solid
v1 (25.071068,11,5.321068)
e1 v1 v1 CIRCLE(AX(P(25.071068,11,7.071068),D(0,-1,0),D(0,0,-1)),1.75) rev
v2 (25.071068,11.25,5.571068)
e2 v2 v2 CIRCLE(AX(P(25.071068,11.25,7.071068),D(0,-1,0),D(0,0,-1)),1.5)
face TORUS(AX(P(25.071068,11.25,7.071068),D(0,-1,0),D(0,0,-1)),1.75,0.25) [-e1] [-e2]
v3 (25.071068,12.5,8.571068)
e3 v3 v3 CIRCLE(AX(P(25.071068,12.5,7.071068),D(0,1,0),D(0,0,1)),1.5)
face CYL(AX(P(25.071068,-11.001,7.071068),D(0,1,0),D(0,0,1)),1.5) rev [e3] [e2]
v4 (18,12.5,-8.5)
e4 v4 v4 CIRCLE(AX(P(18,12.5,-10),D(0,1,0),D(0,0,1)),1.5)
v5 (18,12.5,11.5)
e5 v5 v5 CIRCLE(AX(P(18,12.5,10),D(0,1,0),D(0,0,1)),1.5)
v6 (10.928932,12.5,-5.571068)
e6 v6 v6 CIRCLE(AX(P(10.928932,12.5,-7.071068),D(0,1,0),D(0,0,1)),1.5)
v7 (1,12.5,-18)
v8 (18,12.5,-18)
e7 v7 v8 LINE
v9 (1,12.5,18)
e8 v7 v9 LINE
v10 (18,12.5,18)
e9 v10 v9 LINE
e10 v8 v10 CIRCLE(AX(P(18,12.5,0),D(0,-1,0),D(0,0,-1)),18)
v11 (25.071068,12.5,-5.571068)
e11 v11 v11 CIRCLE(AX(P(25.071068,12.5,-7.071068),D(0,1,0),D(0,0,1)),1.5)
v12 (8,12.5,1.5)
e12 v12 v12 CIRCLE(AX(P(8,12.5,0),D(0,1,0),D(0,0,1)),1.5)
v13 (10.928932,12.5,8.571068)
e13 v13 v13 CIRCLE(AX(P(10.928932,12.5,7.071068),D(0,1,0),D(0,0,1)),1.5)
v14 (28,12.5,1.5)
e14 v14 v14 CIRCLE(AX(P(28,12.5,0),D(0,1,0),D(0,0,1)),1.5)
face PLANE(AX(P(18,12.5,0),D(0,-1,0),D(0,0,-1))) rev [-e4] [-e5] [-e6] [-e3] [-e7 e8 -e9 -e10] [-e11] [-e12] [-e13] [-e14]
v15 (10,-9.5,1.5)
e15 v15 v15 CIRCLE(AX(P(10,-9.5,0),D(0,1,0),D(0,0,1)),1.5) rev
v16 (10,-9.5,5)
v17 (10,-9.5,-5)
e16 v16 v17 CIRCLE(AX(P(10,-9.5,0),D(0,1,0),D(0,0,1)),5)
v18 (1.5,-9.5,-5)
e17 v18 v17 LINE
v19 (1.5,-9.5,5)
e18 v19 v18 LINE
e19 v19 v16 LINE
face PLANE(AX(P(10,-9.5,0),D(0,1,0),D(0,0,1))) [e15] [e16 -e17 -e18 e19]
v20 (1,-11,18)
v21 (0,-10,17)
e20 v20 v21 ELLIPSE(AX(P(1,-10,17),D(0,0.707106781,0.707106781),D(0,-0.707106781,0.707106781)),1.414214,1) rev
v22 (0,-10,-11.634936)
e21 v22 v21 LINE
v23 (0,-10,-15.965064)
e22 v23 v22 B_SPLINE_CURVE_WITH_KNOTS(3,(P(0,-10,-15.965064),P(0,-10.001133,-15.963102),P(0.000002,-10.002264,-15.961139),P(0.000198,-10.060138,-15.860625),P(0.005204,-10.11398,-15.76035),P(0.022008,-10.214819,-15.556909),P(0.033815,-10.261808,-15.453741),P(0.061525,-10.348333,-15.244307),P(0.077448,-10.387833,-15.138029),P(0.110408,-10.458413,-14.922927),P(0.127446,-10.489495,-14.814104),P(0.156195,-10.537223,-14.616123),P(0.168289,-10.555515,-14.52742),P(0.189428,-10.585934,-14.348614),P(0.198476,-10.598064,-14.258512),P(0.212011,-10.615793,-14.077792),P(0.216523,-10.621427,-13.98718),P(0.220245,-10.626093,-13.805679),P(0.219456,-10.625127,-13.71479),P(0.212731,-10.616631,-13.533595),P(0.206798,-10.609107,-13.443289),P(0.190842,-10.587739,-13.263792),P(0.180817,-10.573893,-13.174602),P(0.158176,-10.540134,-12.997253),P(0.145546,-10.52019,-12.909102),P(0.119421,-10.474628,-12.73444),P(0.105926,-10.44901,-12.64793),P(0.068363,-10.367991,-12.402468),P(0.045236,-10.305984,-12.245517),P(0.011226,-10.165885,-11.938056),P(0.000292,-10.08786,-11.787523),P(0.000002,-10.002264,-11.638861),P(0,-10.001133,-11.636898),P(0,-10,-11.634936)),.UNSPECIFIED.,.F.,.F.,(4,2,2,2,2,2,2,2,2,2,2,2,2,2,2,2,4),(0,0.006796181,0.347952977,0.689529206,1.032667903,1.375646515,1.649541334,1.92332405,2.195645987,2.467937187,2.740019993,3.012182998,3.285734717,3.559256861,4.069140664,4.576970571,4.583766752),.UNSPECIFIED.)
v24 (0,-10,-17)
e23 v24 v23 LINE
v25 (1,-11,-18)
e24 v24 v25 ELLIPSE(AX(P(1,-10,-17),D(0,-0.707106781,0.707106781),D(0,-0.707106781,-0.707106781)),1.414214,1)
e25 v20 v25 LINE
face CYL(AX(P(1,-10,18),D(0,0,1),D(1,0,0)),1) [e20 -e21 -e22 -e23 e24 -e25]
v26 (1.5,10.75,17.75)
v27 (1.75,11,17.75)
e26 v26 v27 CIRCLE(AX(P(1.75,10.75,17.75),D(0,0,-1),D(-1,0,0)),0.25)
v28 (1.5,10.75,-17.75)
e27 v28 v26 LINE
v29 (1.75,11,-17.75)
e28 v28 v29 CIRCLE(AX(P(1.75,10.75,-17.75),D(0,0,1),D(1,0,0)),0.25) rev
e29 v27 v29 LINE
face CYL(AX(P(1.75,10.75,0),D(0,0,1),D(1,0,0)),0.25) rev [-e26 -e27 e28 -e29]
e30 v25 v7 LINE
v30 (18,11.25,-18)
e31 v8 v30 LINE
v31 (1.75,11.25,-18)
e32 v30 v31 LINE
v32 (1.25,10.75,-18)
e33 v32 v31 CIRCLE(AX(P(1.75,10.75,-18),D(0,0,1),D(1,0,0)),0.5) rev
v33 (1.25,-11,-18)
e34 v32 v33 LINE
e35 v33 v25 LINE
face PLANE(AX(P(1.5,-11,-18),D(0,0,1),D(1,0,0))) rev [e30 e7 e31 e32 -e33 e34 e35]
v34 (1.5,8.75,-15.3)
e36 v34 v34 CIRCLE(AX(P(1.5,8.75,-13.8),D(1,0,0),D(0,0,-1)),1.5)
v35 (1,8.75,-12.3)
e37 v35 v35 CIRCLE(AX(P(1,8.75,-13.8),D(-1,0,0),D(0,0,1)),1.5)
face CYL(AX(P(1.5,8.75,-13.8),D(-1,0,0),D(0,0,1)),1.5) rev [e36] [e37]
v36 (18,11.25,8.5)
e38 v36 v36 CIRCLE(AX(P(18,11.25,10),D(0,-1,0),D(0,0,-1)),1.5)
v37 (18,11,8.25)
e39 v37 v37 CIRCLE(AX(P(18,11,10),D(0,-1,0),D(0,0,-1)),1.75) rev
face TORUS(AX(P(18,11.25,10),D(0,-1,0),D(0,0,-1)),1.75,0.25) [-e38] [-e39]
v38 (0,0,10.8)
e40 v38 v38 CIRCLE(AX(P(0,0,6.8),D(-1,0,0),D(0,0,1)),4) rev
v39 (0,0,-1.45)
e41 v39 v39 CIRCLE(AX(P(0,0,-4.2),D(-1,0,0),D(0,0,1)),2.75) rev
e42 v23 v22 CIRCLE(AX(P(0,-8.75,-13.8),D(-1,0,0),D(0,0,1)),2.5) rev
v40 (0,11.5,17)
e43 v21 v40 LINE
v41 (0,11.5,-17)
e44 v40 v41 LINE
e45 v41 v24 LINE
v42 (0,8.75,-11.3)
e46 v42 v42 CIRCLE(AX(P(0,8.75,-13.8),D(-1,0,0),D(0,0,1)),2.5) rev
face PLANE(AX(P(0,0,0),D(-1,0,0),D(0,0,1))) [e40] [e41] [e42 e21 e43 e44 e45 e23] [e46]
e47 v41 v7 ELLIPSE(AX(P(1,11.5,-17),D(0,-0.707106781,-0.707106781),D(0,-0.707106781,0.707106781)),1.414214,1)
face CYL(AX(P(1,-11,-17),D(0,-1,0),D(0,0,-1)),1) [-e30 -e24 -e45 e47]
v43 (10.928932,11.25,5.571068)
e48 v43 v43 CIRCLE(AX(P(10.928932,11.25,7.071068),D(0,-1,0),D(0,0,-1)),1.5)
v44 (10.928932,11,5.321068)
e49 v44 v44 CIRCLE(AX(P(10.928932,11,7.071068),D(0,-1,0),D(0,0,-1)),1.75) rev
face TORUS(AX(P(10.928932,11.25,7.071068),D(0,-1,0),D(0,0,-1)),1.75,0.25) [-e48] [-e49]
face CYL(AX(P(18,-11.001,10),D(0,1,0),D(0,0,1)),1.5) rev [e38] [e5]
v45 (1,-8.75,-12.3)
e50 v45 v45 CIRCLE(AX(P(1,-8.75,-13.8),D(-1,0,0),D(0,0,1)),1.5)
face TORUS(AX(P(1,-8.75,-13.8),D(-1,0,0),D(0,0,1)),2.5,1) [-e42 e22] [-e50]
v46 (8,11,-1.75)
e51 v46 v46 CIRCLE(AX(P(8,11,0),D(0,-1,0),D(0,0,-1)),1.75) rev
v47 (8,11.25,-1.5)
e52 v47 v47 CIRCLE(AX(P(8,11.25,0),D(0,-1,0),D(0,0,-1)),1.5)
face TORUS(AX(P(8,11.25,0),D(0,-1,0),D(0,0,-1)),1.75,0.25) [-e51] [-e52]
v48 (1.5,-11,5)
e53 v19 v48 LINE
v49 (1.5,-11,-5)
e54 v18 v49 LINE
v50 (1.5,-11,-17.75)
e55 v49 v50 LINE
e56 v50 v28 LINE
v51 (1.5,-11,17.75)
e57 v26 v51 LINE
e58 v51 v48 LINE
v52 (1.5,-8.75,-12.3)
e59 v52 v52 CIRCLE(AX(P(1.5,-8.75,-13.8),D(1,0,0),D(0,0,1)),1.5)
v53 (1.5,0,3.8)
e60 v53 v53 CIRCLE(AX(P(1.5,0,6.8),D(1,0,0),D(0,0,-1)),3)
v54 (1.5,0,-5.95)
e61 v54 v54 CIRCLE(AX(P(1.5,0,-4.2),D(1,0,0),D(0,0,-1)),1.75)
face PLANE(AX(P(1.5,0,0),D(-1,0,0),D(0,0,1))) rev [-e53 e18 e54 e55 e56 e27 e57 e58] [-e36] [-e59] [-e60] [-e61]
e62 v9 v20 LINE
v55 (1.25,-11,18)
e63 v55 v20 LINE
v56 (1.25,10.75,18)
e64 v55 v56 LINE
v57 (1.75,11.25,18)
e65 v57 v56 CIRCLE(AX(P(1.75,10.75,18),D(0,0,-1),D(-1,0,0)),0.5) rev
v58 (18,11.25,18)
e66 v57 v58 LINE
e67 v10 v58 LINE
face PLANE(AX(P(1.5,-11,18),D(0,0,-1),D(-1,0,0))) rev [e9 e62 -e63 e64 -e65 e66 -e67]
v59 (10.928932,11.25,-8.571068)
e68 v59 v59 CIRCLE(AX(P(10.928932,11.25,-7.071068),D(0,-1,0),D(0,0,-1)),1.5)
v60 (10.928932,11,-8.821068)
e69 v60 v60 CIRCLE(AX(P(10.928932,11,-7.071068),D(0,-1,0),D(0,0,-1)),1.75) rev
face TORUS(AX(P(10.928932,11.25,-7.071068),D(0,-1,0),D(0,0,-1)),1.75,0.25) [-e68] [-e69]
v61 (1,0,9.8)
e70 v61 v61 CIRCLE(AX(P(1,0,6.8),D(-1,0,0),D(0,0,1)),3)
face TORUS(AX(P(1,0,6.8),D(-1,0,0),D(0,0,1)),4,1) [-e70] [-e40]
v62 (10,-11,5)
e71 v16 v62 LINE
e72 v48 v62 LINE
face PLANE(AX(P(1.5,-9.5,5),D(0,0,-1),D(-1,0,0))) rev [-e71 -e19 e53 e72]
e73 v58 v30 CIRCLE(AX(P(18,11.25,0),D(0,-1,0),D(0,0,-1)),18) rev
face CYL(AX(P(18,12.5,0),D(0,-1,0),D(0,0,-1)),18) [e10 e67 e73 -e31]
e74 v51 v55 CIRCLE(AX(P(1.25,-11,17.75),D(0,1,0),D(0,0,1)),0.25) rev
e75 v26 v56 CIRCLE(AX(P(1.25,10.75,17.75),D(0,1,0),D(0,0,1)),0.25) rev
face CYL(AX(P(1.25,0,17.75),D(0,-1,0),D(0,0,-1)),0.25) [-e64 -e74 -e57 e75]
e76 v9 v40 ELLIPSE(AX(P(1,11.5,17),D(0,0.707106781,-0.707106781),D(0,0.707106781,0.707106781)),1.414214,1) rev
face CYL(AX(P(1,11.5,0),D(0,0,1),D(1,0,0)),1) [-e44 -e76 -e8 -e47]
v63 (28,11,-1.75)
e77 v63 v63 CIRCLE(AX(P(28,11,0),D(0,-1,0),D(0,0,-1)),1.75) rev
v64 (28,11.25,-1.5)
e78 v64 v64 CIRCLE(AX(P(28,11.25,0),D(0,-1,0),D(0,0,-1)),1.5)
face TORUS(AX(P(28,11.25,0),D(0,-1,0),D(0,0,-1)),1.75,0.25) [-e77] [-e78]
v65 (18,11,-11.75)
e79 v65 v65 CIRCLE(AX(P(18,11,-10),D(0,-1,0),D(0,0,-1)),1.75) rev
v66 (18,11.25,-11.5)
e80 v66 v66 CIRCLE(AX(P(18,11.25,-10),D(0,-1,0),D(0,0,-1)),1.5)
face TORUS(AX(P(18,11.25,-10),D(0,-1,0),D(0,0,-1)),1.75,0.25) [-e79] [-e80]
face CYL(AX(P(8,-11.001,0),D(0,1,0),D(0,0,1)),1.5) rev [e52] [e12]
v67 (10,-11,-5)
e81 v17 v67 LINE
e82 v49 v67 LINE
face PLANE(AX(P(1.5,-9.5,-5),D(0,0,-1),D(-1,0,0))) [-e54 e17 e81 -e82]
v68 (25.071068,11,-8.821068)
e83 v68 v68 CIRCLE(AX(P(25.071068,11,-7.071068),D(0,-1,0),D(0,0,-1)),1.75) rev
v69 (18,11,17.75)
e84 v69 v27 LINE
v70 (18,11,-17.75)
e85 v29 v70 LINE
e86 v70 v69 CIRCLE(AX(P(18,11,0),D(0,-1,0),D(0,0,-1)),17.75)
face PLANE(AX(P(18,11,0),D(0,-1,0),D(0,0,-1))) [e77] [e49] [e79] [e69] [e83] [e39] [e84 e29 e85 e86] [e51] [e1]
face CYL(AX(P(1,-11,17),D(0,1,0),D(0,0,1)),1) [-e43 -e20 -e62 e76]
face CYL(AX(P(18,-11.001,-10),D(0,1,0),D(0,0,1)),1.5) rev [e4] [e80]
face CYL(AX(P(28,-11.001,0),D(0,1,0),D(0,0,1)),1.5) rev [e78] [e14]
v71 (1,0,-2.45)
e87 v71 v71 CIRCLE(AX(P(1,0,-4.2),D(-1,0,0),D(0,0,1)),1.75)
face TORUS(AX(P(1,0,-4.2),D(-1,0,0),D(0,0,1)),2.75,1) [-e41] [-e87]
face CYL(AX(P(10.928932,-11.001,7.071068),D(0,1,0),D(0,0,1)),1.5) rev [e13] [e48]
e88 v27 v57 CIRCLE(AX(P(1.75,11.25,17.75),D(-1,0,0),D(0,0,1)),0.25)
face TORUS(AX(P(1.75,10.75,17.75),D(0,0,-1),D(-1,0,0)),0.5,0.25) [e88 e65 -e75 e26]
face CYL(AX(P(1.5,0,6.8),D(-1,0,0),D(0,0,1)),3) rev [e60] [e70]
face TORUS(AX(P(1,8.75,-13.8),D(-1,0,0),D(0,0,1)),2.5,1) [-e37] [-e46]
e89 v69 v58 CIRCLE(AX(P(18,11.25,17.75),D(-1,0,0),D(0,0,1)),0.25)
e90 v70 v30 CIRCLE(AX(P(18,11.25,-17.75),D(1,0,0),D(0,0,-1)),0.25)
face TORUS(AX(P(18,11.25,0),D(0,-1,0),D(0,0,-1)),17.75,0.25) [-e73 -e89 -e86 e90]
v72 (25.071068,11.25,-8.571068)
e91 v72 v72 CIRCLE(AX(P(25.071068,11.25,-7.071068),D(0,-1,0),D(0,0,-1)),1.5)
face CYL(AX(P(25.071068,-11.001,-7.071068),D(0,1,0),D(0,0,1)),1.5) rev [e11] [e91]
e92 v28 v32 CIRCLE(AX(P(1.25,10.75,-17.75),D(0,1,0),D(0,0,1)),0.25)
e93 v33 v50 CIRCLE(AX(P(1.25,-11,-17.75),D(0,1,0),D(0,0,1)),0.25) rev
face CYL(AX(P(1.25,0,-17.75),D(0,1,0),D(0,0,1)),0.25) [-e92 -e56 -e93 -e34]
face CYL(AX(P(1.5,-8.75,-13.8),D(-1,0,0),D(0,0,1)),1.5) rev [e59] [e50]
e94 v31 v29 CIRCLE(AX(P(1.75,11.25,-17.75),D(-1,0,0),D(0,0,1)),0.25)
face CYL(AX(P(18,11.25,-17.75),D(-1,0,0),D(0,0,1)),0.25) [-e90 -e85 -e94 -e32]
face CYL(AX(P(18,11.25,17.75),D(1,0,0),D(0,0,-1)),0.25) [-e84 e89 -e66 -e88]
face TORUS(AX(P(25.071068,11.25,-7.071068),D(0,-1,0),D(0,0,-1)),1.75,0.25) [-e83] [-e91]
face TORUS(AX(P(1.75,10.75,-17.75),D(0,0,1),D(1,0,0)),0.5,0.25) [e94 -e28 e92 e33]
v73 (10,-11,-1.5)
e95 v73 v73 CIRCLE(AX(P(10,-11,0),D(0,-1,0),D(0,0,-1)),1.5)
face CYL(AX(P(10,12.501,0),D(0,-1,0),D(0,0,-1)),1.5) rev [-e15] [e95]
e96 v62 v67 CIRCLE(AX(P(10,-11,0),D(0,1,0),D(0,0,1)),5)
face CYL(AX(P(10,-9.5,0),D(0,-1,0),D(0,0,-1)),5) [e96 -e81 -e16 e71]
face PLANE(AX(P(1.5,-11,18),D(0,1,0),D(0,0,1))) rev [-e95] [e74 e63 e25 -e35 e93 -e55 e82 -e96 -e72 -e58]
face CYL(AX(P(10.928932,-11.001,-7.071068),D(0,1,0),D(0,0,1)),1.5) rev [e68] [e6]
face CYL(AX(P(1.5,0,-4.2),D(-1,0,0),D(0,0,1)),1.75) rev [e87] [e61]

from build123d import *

# Parameters (mm, degrees)
CROQUIS1_W              = 36
CROQUIS1_H              = 22
CROQUIS1_R              = 1.5
CROQUIS1_R_2            = 3
CROQUIS1_R_3            = 1.75
SALIENTE_EXTRUIR1_DEPTH = 1.5
SALIENTE_EXTRUIR3_START = -22
SALIENTE_EXTRUIR3_DEPTH = 1.5
SALIENTE_EXTRUIR4_START = 22
CROQUIS4_W              = 1.5
CROQUIS4_H              = 10
SALIENTE_EXTRUIR4_DEPTH = 1.5
CORTAR_EXTRUIR1_REACH   = 48.607
CROQUIS5_R              = 1.5
CORTAR_EXTRUIR2_REACH   = 48.607
CROQUIS7_R              = 1.5
REDONDEO2_R             = 1
REDONDEO3_R             = 0.25


with BuildPart() as part:
    # Croquis1 → Saliente-Extruir1 (new body)
    with BuildSketch(Plane(origin=(0, 0, 0), x_dir=(0, 0, -1), z_dir=(1, 0, 0))):
        Rectangle(CROQUIS1_W, CROQUIS1_H)
        with Locations((13.8, 8.75)):
            Circle(CROQUIS1_R, mode=Mode.SUBTRACT)
        with Locations((-6.8, 0)):
            Circle(CROQUIS1_R_2, mode=Mode.SUBTRACT)
        with Locations(Location((13.8, -8.75, 0), (0, 0, 180))):
            Circle(CROQUIS1_R, mode=Mode.SUBTRACT)
        with Locations((4.2, 0)):
            Circle(CROQUIS1_R_3, mode=Mode.SUBTRACT)
    extrude(amount=SALIENTE_EXTRUIR1_DEPTH)

    # Croquis3<2> → Saliente-Extruir3 (add)
    with BuildSketch(Plane.XZ.offset(11).offset(SALIENTE_EXTRUIR3_START)):
        with BuildLine():
            Line((18, -18), (0, -18))
            Line((0, -18), (0, 18))
            Line((0, 18), (18, 18))
            ThreePointArc((18, 18), (36, 0), (18, -18))
        make_face()
    extrude(amount=-SALIENTE_EXTRUIR3_DEPTH)

    # Croquis4 → Saliente-Extruir4 (add)
    with BuildSketch(Plane(origin=(0, 11, 0), x_dir=(-1, 0, 0), z_dir=(0, -1, 0)).offset(SALIENTE_EXTRUIR4_START)):
        with BuildLine():
            Line((-1.5, -5), (-1.5, 5))
            Line((-1.5, 5), (-10, 5))
            ThreePointArc((-10, 5), (-15, 0), (-10, -5))
            Line((-10, -5), (-1.5, -5))
        make_face()
        with Locations((-0.75, 0)):
            Rectangle(CROQUIS4_W, CROQUIS4_H)
    extrude(amount=-SALIENTE_EXTRUIR4_DEPTH)

    # Croquis5 → Cortar-Extruir1 (cut, up to next)
    with BuildSketch(Plane(origin=(0, -11, 0), x_dir=(-1, 0, 0), z_dir=(0, -1, 0)), mode=Mode.PRIVATE) as cortar_extruir1_sk1:
        with Locations(Location((-10, 0, 0), (0, 0, 90))):
            Circle(CROQUIS5_R)
    cortar_extruir1_tool1 = extrude(cortar_extruir1_sk1.sketch, amount=-CORTAR_EXTRUIR1_REACH, mode=Mode.PRIVATE) & part.part
    add(cortar_extruir1_tool1.solids().sort_by_distance((10, -11, 0))[0], mode=Mode.SUBTRACT)

    # Croquis7 → Cortar-Extruir2 (cut, up to next)
    with BuildSketch(Plane(origin=(0, 12.5, 0), x_dir=(-1, 0, 0), z_dir=(0, 1, 0)), mode=Mode.PRIVATE) as cortar_extruir2_sk1:
        with Locations(Location((-8, 0, 0), (0, 0, 90))):
            Circle(CROQUIS7_R)
    cortar_extruir2_tool1 = extrude(cortar_extruir2_sk1.sketch, amount=-CORTAR_EXTRUIR2_REACH, mode=Mode.PRIVATE) & part.part
    # Croquis7 → Cortar-Extruir2 (cut, up to next)
    with BuildSketch(Plane(origin=(0, 12.5, 0), x_dir=(-1, 0, 0), z_dir=(0, 1, 0)), mode=Mode.PRIVATE) as cortar_extruir2_sk2:
        with Locations(Location((-10.928932188, -7.071067812, 0), (0, 0, 90))):
            Circle(CROQUIS7_R)
    cortar_extruir2_tool2 = extrude(cortar_extruir2_sk2.sketch, amount=-CORTAR_EXTRUIR2_REACH, mode=Mode.PRIVATE) & part.part
    # Croquis7 → Cortar-Extruir2 (cut, up to next)
    with BuildSketch(Plane(origin=(0, 12.5, 0), x_dir=(-1, 0, 0), z_dir=(0, 1, 0)), mode=Mode.PRIVATE) as cortar_extruir2_sk3:
        with Locations(Location((-18, -10, 0), (0, 0, 90))):
            Circle(CROQUIS7_R)
    cortar_extruir2_tool3 = extrude(cortar_extruir2_sk3.sketch, amount=-CORTAR_EXTRUIR2_REACH, mode=Mode.PRIVATE) & part.part
    # Croquis7 → Cortar-Extruir2 (cut, up to next)
    with BuildSketch(Plane(origin=(0, 12.5, 0), x_dir=(-1, 0, 0), z_dir=(0, 1, 0)), mode=Mode.PRIVATE) as cortar_extruir2_sk4:
        with Locations(Location((-25.071067812, -7.071067812, 0), (0, 0, 90))):
            Circle(CROQUIS7_R)
    cortar_extruir2_tool4 = extrude(cortar_extruir2_sk4.sketch, amount=-CORTAR_EXTRUIR2_REACH, mode=Mode.PRIVATE) & part.part
    # Croquis7 → Cortar-Extruir2 (cut, up to next)
    with BuildSketch(Plane(origin=(0, 12.5, 0), x_dir=(-1, 0, 0), z_dir=(0, 1, 0)), mode=Mode.PRIVATE) as cortar_extruir2_sk5:
        with Locations(Location((-28, 0, 0), (0, 0, 90))):
            Circle(CROQUIS7_R)
    cortar_extruir2_tool5 = extrude(cortar_extruir2_sk5.sketch, amount=-CORTAR_EXTRUIR2_REACH, mode=Mode.PRIVATE) & part.part
    # Croquis7 → Cortar-Extruir2 (cut, up to next)
    with BuildSketch(Plane(origin=(0, 12.5, 0), x_dir=(-1, 0, 0), z_dir=(0, 1, 0)), mode=Mode.PRIVATE) as cortar_extruir2_sk6:
        with Locations(Location((-25.071067812, 7.071067812, 0), (0, 0, 90))):
            Circle(CROQUIS7_R)
    cortar_extruir2_tool6 = extrude(cortar_extruir2_sk6.sketch, amount=-CORTAR_EXTRUIR2_REACH, mode=Mode.PRIVATE) & part.part
    # Croquis7 → Cortar-Extruir2 (cut, up to next)
    with BuildSketch(Plane(origin=(0, 12.5, 0), x_dir=(-1, 0, 0), z_dir=(0, 1, 0)), mode=Mode.PRIVATE) as cortar_extruir2_sk7:
        with Locations(Location((-18, 10, 0), (0, 0, 90))):
            Circle(CROQUIS7_R)
    cortar_extruir2_tool7 = extrude(cortar_extruir2_sk7.sketch, amount=-CORTAR_EXTRUIR2_REACH, mode=Mode.PRIVATE) & part.part
    # Croquis7 → Cortar-Extruir2 (cut, up to next)
    with BuildSketch(Plane(origin=(0, 12.5, 0), x_dir=(-1, 0, 0), z_dir=(0, 1, 0)), mode=Mode.PRIVATE) as cortar_extruir2_sk8:
        with Locations(Location((-10.928932188, 7.071067812, 0), (0, 0, 90))):
            Circle(CROQUIS7_R)
    cortar_extruir2_tool8 = extrude(cortar_extruir2_sk8.sketch, amount=-CORTAR_EXTRUIR2_REACH, mode=Mode.PRIVATE) & part.part
    add(cortar_extruir2_tool1.solids().sort_by_distance((8, 12.5, 0))[0], mode=Mode.SUBTRACT)
    add(cortar_extruir2_tool2.solids().sort_by_distance((10.928932, 12.5, -7.071068))[0], mode=Mode.SUBTRACT)
    add(cortar_extruir2_tool3.solids().sort_by_distance((18, 12.5, -10))[0], mode=Mode.SUBTRACT)
    add(cortar_extruir2_tool4.solids().sort_by_distance((25.071068, 12.5, -7.071068))[0], mode=Mode.SUBTRACT)
    add(cortar_extruir2_tool5.solids().sort_by_distance((28, 12.5, 0))[0], mode=Mode.SUBTRACT)
    add(cortar_extruir2_tool6.solids().sort_by_distance((25.071068, 12.5, 7.071068))[0], mode=Mode.SUBTRACT)
    add(cortar_extruir2_tool7.solids().sort_by_distance((18, 12.5, 10))[0], mode=Mode.SUBTRACT)
    add(cortar_extruir2_tool8.solids().sort_by_distance((10.928932, 12.5, 7.071068))[0], mode=Mode.SUBTRACT)

    # Redondeo2
    # the kernel refuses this fillet: 1 mm, written as the material it takes off along each edge
    with BuildSketch(Plane(origin=(0, 8.75, -13.8), x_dir=(0, 0, -1), z_dir=(0, -1, 0))) as redondeo2_piece_1:
        with BuildLine():
            CenterArc((1.5 + REDONDEO2_R, REDONDEO2_R), REDONDEO2_R, 180, 90)
            Line((1.5, REDONDEO2_R), (1.5, 0))
            Line((1.5, 0), (1.5 + REDONDEO2_R, 0))
        make_face()
    revolve(axis=Axis((0, 8.75, -13.8), (1, 0, 0)), mode=Mode.SUBTRACT)
    with BuildSketch(Plane(origin=(0, 0, 6.8), x_dir=(0, 0, -1), z_dir=(0, -1, 0))) as redondeo2_piece_2:
        with BuildLine():
            CenterArc((3 + REDONDEO2_R, REDONDEO2_R), REDONDEO2_R, 180, 90)
            Line((3, REDONDEO2_R), (3, 0))
            Line((3, 0), (3 + REDONDEO2_R, 0))
        make_face()
    revolve(axis=Axis((0, 0, 6.8), (1, 0, 0)), mode=Mode.SUBTRACT)
    with BuildSketch(Plane(origin=(0, -8.75, -13.8), x_dir=(0, 0, 1), z_dir=(0, 1, 0))) as redondeo2_piece_3:
        with BuildLine():
            CenterArc((1.5 + REDONDEO2_R, REDONDEO2_R), REDONDEO2_R, 180, 90)
            Line((1.5, REDONDEO2_R), (1.5, 0))
            Line((1.5, 0), (1.5 + REDONDEO2_R, 0))
        make_face()
    revolve(axis=Axis((0, -8.75, -13.8), (1, 0, 0)), mode=Mode.SUBTRACT)
    with BuildSketch(Plane(origin=(0, 0, -4.2), x_dir=(0, 0, -1), z_dir=(0, -1, 0))) as redondeo2_piece_4:
        with BuildLine():
            CenterArc((1.75 + REDONDEO2_R, REDONDEO2_R), REDONDEO2_R, 180, 90)
            Line((1.75, REDONDEO2_R), (1.75, 0))
            Line((1.75, 0), (1.75 + REDONDEO2_R, 0))
        make_face()
    revolve(axis=Axis((0, 0, -4.2), (1, 0, 0)), mode=Mode.SUBTRACT)
    with BuildSketch(Plane(origin=(0, 12.5, -20.5), x_dir=(0, -1, 0), z_dir=(0, 0, 1))) as redondeo2_piece_5:
        with BuildLine():
            CenterArc((REDONDEO2_R, REDONDEO2_R), REDONDEO2_R, 180, 90)
            Line((0, REDONDEO2_R), (0, 0))
            Line((0, 0), (REDONDEO2_R, 0))
        make_face()
    extrude(amount=41, mode=Mode.SUBTRACT)
    with BuildSketch(Plane(origin=(0, -11, 20.5), x_dir=(1, 0, 0), z_dir=(0, 0, -1))) as redondeo2_piece_6:
        with BuildLine():
            CenterArc((REDONDEO2_R, -REDONDEO2_R), REDONDEO2_R, 90, 90)
            Line((0, -REDONDEO2_R), (0, 0))
            Line((0, 0), (REDONDEO2_R, 0))
        make_face()
    extrude(amount=41, mode=Mode.SUBTRACT)
    with BuildSketch(Plane(origin=(0, 15, 18), x_dir=(0, 0, -1), z_dir=(0, -1, 0)), Plane(origin=(0, -13.5, -18), x_dir=(0, 0, 1), z_dir=(0, 1, 0))) as redondeo2_piece_7:
        with BuildLine():
            CenterArc((REDONDEO2_R, REDONDEO2_R), REDONDEO2_R, 180, 90)
            Line((0, REDONDEO2_R), (0, 0))
            Line((0, 0), (REDONDEO2_R, 0))
        make_face()
    extrude(amount=28.5, mode=Mode.SUBTRACT)

    # Redondeo3
    redondeo3_edges = [part.edges().sort_by_distance(p)[0] for p in [
        (1.5, 0, 18),
        (9.75, 11, -18),
        (36, 11, 0),
        (9.75, 11, 18),
        (1.5, 0, -18),
        (10.928932188, 11, 5.571067812),
        (18, 11, 8.5),
        (25.071067812, 11, 5.571067812),
        (28, 11, -1.5),
        (25.071067812, 11, -8.571067812),
        (18, 11, -11.5),
        (1.5, 11, 0),
        (10.928932188, 11, -8.571067812),
        (8, 11, -1.5),
    ]]
    fillet(redondeo3_edges, radius=REDONDEO3_R)


solid = part.part
